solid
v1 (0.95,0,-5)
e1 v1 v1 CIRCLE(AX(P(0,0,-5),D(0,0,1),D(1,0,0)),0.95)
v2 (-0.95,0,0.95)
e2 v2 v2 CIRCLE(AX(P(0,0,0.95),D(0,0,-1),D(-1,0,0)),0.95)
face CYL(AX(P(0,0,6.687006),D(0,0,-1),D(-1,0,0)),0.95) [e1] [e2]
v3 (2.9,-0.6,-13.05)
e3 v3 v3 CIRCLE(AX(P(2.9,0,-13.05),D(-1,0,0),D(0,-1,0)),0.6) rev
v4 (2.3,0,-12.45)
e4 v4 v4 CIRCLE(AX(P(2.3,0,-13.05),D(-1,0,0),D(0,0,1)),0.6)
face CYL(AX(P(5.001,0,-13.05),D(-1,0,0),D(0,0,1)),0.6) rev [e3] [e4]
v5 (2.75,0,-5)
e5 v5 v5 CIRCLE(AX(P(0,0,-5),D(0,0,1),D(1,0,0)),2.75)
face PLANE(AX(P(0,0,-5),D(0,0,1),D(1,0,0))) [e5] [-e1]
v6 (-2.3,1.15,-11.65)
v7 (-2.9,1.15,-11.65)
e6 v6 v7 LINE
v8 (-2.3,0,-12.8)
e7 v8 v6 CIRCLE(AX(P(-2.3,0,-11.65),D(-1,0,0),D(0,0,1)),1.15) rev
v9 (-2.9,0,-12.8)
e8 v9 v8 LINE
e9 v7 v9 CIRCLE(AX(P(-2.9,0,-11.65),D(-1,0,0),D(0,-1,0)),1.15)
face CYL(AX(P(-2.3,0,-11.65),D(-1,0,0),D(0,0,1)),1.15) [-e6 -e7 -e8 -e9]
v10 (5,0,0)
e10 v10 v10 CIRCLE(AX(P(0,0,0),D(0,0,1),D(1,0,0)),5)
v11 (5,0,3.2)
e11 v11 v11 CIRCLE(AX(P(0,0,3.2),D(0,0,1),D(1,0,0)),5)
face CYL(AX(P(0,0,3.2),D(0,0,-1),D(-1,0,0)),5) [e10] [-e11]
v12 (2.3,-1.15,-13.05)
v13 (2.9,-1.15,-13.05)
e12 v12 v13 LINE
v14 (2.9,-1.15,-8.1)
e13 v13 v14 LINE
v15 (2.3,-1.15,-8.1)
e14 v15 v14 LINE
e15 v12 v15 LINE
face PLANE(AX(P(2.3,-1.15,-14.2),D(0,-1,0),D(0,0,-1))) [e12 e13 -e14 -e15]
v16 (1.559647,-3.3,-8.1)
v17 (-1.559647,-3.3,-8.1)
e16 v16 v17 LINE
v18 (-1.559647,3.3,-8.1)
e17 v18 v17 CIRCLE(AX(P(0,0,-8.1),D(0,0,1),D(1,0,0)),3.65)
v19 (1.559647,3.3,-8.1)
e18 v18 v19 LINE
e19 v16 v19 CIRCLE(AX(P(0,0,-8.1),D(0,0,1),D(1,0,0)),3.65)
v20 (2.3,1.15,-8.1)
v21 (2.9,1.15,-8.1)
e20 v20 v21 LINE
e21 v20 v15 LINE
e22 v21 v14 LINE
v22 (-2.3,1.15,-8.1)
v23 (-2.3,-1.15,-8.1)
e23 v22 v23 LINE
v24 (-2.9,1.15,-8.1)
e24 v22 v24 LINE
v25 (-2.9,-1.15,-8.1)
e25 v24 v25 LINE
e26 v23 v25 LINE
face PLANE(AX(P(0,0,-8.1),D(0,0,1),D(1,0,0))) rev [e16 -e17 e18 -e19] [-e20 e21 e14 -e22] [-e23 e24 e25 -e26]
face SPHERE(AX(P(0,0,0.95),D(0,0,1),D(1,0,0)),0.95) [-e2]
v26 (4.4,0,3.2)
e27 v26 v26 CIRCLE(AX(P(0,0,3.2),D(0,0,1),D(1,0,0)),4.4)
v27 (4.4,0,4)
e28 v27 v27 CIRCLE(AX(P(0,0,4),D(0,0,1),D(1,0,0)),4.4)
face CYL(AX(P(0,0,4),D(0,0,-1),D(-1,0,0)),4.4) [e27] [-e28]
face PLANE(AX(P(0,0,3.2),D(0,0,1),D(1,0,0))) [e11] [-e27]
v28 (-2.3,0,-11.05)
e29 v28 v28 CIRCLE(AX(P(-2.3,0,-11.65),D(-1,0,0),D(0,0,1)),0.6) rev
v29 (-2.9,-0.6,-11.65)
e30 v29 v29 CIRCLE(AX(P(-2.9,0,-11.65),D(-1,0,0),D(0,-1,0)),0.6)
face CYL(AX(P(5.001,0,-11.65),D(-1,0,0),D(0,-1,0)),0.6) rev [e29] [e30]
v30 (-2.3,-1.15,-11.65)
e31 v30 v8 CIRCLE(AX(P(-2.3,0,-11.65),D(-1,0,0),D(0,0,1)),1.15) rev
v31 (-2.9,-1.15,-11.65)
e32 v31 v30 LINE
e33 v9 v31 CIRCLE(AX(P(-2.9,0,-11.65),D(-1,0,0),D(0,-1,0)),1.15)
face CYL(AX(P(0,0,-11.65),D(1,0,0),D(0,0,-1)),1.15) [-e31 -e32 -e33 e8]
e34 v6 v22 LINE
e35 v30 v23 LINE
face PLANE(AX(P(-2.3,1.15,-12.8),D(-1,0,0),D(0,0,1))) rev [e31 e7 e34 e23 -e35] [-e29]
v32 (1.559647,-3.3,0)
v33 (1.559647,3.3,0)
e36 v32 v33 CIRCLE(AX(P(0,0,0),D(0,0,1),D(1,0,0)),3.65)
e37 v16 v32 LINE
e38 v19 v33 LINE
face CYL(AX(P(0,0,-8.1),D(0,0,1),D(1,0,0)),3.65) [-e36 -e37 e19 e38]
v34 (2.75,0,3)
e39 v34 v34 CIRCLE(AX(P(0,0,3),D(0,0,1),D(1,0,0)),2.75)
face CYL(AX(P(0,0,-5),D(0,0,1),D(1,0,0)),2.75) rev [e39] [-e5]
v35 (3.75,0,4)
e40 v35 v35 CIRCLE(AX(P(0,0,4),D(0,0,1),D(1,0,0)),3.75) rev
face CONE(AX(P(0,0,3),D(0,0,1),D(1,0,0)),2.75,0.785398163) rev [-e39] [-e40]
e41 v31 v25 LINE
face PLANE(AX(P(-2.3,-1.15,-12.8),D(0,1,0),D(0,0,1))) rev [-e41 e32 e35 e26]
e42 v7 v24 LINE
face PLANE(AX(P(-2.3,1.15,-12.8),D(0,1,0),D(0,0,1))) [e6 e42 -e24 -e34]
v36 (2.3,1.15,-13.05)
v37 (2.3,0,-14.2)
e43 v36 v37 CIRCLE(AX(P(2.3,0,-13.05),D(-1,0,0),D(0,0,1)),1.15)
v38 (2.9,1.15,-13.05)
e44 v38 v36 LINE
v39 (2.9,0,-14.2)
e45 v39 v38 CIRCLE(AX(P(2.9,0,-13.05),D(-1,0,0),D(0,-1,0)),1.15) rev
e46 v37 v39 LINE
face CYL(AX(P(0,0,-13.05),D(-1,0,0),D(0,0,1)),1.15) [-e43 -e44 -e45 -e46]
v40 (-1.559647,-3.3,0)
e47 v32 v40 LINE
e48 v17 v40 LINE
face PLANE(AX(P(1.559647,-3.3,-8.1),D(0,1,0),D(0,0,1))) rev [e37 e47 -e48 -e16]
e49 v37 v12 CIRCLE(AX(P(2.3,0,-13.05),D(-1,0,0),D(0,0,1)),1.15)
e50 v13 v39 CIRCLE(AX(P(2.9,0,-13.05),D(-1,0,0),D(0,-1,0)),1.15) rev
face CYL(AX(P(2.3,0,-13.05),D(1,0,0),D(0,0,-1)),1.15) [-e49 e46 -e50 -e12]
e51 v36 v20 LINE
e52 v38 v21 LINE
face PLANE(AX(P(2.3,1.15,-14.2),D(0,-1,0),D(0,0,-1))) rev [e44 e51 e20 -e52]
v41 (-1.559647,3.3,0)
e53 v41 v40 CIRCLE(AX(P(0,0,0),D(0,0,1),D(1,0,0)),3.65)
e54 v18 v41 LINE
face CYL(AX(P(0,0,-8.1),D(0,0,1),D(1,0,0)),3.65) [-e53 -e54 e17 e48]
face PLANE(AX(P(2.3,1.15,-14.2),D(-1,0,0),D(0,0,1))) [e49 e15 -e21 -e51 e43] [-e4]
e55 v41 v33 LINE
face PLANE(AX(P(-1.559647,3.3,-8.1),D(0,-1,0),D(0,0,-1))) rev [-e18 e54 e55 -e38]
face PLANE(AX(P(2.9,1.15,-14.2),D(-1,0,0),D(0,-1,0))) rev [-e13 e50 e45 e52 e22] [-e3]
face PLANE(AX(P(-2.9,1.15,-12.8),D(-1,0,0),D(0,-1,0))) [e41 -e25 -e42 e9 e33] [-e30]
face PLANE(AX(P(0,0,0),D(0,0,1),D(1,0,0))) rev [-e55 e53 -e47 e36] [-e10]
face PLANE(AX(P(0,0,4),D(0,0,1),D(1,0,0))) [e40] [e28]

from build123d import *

# Parameters (mm, degrees)
ESQUISSE1_R             = 5
BOSS_EXTRU_1_DEPTH      = 3.2
BOSS_EXTRU_2_START      = 3.2
ESQUISSE1_3_R           = 4.4
BOSS_EXTRU_2_DEPTH      = 0.8
BOSS_EXTRU_3_DEPTH      = 8.1
ENL_V_START             = 4
ESQUISSE1_5_R           = 2.75
ENL_V_MAT_EXTRU_1_DEPTH = 9
BOSS_EXTRU_4_START      = -5
ESQUISSE1_6_R           = 0.95
BOSS_EXTRU_4_DEPTH      = 6.9
CHANFREIN1_SIZE         = 1
CONG_1_R                = 0.95
ESQUISSE2_W             = 0.6
ESQUISSE2_H             = 2.3
BOSS_EXTRU_5_DEPTH      = 6.1
ESQUISSE2_3_W           = 0.6
ESQUISSE2_3_H           = 2.3
BOSS_EXTRU_6_DEPTH      = 4.7
CONG_2_R                = 1.15
ENL_V_MAT_EXTRU_2_REACH = 18.731
ESQUISSE3_R             = 0.6
ENL_V_MAT_EXTRU_3_REACH = 19.001
ESQUISSE4_R             = 0.6


with BuildPart() as part:
    # Esquisse1 → Boss.-Extru.1 (new body)
    with BuildSketch(Plane.XY):
        Circle(ESQUISSE1_R)
    extrude(amount=BOSS_EXTRU_1_DEPTH)

    # Esquisse1<3> → Boss.-Extru.2 (add)
    with BuildSketch(Plane.XY.offset(BOSS_EXTRU_2_START)):
        Circle(ESQUISSE1_3_R)
    extrude(amount=BOSS_EXTRU_2_DEPTH)

    # Esquisse1<4> → Boss.-Extru.3 (add)
    with BuildSketch(Plane.XY):
        with BuildLine():
            Line((-1.559647396, 3.3), (1.559647396, 3.3))
            ThreePointArc((1.559647396, 3.3), (3.65, 0), (1.559647396, -3.3))
            Line((1.559647396, -3.3), (-1.559647396, -3.3))
            ThreePointArc((-1.559647396, -3.3), (-3.65, 0), (-1.559647396, 3.3))
        make_face()
    extrude(amount=-BOSS_EXTRU_3_DEPTH)

    # Esquisse1<5> → Enlèv. mat.-Extru.1 (cut)
    with BuildSketch(Plane.XY.offset(ENL_V_START)):
        Circle(ESQUISSE1_5_R)
    extrude(amount=-ENL_V_MAT_EXTRU_1_DEPTH, mode=Mode.SUBTRACT)

    # Esquisse1<6> → Boss.-Extru.4 (add)
    with BuildSketch(Plane.XY.offset(BOSS_EXTRU_4_START)):
        Circle(ESQUISSE1_6_R)
    extrude(amount=BOSS_EXTRU_4_DEPTH)

    # Chanfrein1
    chanfrein1_edges = [part.edges().sort_by_distance(p)[0] for p in [
        (-2.75, 0, 4),
    ]]
    chamfer(chanfrein1_edges, length=CHANFREIN1_SIZE)

    # Congé1
    cong_1_edges = [part.edges().sort_by_distance(p)[0] for p in [
        (-0.95, 0, 1.9),
    ]]
    fillet(cong_1_edges, radius=CONG_1_R)

    # Esquisse2 → Boss.-Extru.5 (add)
    with BuildSketch(Plane(origin=(0, 0, -8.1), x_dir=(-1, 0, 0), z_dir=(0, 0, -1))):
        with Locations((-2.6, 0)):
            Rectangle(ESQUISSE2_W, ESQUISSE2_H)
    extrude(amount=BOSS_EXTRU_5_DEPTH)

    # Esquisse2<3> → Boss.-Extru.6 (add)
    with BuildSketch(Plane(origin=(0, 0, -8.1), x_dir=(-1, 0, 0), z_dir=(0, 0, -1))):
        with Locations((2.6, 0)):
            Rectangle(ESQUISSE2_3_W, ESQUISSE2_3_H)
    extrude(amount=BOSS_EXTRU_6_DEPTH)

    # Congé2
    cong_2_edges = [part.edges().sort_by_distance(p)[0] for p in [
        (-2.6, -1.15, -12.8),
        (-2.6, 1.15, -12.8),
        (2.6, -1.15, -14.2),
        (2.6, 1.15, -14.2),
    ]]
    fillet(cong_2_edges, radius=CONG_2_R - 0.0001)  # a hair under: the kernel refuses the full size

    # Esquisse3 → Enlèv. mat.-Extru.2 (cut, up to next)
    with BuildSketch(Plane.ZY.offset(-2.3), mode=Mode.PRIVATE) as enl_v_mat_extru_2_sk1:
        with Locations((-13.05, 0)):
            Circle(ESQUISSE3_R)
    enl_v_mat_extru_2_tool1 = extrude(enl_v_mat_extru_2_sk1.sketch, amount=-ENL_V_MAT_EXTRU_2_REACH, mode=Mode.PRIVATE) & part.part
    add(enl_v_mat_extru_2_tool1.solids().sort_by_distance((2.3, 0, -13.05))[0], mode=Mode.SUBTRACT)

    # Esquisse4 → Enlèv. mat.-Extru.3 (cut, up to next)
    with BuildSketch(Plane.ZY.offset(2.9), mode=Mode.PRIVATE) as enl_v_mat_extru_3_sk1:
        with Locations(Location((-11.65, 0, 0), (0, 0, 270))):
            Circle(ESQUISSE4_R)
    enl_v_mat_extru_3_tool1 = extrude(enl_v_mat_extru_3_sk1.sketch, amount=-ENL_V_MAT_EXTRU_3_REACH, mode=Mode.PRIVATE) & part.part
    add(enl_v_mat_extru_3_tool1.solids().sort_by_distance((-2.9, 0, -11.65))[0], mode=Mode.SUBTRACT)


solid = part.part
